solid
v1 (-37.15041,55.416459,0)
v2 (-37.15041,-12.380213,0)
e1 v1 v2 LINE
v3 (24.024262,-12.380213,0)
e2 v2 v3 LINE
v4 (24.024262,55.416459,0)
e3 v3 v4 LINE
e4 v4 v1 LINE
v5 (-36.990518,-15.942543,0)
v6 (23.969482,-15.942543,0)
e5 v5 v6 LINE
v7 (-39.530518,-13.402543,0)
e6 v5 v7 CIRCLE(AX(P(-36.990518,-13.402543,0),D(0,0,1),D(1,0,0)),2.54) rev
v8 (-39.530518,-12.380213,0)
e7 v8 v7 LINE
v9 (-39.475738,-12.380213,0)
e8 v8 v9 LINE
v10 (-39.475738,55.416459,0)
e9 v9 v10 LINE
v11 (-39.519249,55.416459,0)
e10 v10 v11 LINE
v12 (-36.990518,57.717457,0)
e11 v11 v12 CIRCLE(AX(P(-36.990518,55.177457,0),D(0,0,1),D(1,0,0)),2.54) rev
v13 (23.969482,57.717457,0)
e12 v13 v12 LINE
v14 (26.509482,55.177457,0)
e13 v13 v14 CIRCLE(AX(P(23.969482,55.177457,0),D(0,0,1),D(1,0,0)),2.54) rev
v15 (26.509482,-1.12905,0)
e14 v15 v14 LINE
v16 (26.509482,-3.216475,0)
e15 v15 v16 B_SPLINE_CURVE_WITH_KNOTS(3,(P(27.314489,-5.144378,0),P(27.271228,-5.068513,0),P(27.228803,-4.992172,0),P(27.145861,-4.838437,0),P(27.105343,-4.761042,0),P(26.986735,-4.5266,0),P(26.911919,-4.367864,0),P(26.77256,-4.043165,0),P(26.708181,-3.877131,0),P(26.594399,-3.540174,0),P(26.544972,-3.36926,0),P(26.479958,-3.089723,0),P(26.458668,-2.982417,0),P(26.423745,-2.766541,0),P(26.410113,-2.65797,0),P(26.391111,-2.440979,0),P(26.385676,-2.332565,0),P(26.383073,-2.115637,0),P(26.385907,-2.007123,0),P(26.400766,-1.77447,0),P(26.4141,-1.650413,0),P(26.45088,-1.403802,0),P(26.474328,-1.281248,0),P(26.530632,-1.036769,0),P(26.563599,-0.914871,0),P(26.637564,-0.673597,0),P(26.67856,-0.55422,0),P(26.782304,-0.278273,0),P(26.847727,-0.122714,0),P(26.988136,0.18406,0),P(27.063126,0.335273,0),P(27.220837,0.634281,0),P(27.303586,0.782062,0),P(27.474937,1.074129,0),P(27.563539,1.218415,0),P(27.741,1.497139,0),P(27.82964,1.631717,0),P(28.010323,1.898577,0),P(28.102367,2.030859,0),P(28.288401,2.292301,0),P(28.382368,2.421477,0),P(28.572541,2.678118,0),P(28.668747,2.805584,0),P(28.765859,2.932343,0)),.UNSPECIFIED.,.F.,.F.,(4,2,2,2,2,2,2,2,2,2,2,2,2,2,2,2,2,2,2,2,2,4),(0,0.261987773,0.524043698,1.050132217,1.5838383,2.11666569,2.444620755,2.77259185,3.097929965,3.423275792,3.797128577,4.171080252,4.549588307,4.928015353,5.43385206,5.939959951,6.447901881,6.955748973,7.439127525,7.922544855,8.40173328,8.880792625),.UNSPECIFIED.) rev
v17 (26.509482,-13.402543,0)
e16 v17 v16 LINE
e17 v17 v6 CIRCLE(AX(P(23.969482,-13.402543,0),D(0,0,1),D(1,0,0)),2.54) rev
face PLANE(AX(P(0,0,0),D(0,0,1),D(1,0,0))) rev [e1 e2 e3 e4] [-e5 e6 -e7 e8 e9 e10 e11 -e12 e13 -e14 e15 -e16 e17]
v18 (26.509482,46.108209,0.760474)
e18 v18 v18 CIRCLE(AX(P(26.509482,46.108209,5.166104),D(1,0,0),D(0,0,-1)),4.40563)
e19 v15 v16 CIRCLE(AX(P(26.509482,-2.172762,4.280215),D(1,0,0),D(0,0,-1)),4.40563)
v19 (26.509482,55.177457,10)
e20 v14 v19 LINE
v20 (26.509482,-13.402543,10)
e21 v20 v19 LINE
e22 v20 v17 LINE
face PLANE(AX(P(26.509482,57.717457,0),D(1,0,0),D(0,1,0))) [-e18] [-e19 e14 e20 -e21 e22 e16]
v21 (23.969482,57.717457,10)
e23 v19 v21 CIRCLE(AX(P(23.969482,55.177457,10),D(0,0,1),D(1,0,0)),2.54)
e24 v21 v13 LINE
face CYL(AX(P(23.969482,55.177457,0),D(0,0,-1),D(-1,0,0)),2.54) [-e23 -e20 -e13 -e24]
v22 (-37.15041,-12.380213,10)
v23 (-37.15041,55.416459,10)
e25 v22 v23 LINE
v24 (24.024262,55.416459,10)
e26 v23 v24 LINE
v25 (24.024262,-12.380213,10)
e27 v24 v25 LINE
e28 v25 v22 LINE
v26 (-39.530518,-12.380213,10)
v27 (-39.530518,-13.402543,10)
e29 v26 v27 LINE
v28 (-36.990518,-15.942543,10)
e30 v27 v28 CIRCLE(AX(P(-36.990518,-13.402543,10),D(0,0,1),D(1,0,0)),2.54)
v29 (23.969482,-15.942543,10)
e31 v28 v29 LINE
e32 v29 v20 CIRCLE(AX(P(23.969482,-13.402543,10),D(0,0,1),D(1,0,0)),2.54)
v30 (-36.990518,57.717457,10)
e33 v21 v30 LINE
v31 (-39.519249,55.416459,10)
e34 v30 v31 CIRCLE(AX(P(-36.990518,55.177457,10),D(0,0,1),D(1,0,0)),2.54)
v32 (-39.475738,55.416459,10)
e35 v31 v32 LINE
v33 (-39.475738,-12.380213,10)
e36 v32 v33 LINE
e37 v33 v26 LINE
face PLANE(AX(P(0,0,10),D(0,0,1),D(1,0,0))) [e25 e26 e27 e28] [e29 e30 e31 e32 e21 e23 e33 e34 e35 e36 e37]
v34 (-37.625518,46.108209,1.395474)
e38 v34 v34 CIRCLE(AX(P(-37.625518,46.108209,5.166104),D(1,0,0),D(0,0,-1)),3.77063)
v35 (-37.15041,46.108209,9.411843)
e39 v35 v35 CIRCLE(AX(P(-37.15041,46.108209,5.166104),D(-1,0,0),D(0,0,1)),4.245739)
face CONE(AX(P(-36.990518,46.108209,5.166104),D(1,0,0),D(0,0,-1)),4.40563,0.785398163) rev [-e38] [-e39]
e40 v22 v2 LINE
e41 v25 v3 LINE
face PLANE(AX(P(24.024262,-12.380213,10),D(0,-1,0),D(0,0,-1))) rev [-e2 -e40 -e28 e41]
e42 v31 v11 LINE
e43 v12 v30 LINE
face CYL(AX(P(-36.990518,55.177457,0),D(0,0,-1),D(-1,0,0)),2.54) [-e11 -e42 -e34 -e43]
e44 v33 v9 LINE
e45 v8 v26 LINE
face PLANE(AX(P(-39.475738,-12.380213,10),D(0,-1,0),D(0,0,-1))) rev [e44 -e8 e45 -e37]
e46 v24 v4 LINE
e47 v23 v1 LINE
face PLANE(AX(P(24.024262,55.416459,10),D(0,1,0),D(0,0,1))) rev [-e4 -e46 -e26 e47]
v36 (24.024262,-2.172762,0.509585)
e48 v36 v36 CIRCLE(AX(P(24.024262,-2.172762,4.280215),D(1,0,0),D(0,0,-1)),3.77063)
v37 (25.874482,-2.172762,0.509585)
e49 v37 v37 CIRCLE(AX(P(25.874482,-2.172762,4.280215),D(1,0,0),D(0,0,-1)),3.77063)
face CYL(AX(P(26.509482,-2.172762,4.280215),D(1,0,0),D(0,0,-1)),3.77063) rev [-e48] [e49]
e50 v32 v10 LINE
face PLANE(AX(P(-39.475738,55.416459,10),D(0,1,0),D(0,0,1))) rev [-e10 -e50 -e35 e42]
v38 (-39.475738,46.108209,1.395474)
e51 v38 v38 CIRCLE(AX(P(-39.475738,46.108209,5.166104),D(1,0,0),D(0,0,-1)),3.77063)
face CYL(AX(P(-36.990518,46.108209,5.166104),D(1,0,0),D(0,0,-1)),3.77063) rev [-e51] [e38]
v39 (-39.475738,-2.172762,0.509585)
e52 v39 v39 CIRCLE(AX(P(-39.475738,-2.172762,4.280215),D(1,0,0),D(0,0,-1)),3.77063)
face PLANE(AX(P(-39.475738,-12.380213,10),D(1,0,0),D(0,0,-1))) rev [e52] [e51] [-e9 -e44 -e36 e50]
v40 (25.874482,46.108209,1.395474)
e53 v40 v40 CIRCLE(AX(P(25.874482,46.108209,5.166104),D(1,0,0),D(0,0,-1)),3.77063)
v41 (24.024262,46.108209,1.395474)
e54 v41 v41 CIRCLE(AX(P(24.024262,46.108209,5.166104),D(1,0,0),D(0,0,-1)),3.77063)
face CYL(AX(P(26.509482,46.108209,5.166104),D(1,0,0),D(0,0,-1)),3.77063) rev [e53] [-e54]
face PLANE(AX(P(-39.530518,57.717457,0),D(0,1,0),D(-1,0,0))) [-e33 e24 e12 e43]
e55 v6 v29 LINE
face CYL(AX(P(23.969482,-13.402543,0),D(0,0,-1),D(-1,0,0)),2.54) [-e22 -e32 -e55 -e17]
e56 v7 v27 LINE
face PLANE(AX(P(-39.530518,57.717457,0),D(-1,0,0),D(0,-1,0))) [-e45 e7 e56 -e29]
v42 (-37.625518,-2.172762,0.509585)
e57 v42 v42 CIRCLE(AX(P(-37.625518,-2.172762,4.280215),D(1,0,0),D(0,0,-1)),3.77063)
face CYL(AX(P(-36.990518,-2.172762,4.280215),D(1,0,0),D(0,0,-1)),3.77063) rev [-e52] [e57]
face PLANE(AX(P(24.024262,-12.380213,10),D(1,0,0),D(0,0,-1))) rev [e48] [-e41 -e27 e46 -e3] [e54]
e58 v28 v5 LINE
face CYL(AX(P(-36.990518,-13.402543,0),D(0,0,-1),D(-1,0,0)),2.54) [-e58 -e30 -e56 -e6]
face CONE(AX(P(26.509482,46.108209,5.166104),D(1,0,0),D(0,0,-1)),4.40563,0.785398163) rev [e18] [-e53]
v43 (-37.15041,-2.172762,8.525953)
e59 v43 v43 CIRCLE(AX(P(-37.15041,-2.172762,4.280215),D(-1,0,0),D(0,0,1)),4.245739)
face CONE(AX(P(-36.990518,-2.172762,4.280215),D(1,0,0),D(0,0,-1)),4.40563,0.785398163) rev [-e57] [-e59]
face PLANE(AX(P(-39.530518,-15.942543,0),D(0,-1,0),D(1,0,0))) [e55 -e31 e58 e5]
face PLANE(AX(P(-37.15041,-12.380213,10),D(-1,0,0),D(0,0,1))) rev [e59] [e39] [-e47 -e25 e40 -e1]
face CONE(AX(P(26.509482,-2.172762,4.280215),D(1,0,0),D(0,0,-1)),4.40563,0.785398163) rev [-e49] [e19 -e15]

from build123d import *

# Parameters (mm, degrees)
SKETCH1_W                                  = 66.04
SKETCH1_H                                  = 73.66
BOSS_EXTRUDE1_DEPTH                        = 66.04
CONVERT_SOLID1_START                       = 10
CONVERT_SOLID1_OUTLINE_W                   = 66.04
CONVERT_SOLID1_OUTLINE_H                   = 73.66
CONVERT_SOLID1_DEPTH                       = 56.04
SKETCH12_W                                 = 61.174671733
SKETCH12_H                                 = 67.796672281
CUT_EXTRUDE1_DEPTH                         = 71.66800329
FILLET1_R                                  = 2.54
CBORE_FOR_8_FILLISTER_HEAD_MACHINE_2_COUNT = 2
CBORE_FOR_8_FILLISTER_HEAD_MACHINE_2_PITCH = 48.289098212
LPATTERN1_COUNT                            = 2
LPATTERN1_PITCH                            = 63.5


# Read off the part's stored shape, not the designer's step: Convert-Solid1
with BuildPart() as part:
    # Sketch1 → Boss-Extrude1 (new body)
    with BuildSketch(Plane.XY):
        with Locations((-6.510518448, 20.887456633)):
            Rectangle(SKETCH1_W, SKETCH1_H)
    extrude(amount=BOSS_EXTRUDE1_DEPTH)

    # Convert-Solid1 outline → Convert-Solid1 (cut)
    with BuildSketch(Plane.XY.offset(CONVERT_SOLID1_START)):
        with Locations((-6.510518448, 20.887456633)):
            Rectangle(CONVERT_SOLID1_OUTLINE_W, CONVERT_SOLID1_OUTLINE_H)
    extrude(amount=CONVERT_SOLID1_DEPTH, mode=Mode.SUBTRACT)

    # Sketch12 → Cut-Extrude1 (cut, symmetric)
    with BuildSketch(Plane(origin=(0, 0, 0), x_dir=(-1, 0, 0), z_dir=(0, 0, -1))):
        with Locations((6.563074008, 21.518123352)):
            Rectangle(SKETCH12_W, SKETCH12_H)
    cut_extrude1 = extrude(amount=CUT_EXTRUDE1_DEPTH, both=True, mode=Mode.SUBTRACT)

    # Fillet1
    fillet1_edges = [part.edges().sort_by_distance(p)[0] for p in [
        (-39.530518448, 57.717456633, 5),
        (-39.530518448, -15.942543367, 5),
        (26.509481552, -15.942543367, 5),
        (26.509481552, 57.717456633, 5),
    ]]
    fillet(fillet1_edges, radius=FILLET1_R)

    # Sketch18 → CBORE for #8 Fillister Head Machine Screw1 (revolve, cut)
    with BuildSketch(Plane(origin=(26.509481552, 46.108209089, 5.16610426), x_dir=(0, 0, -1), z_dir=(0, 1, 0))):
        Polygon((0, 0), (0, 26.750674586), (2.2479, 25.4), (2.2479, 3.9624), (3.77063, 3.9624), (3.77063, 0.635), (4.40563, 0), align=None)
    cbore_for_8_fillister_head_machine_scre = revolve(axis=Axis((32.859481552, 46.108209089, 5.16610426), (-1, 0, 0)), mode=Mode.SUBTRACT)

    # CBORE for _8 Fillister Head Machine  2: CBORE for #8 Fillister Head Machine Screw1 ×2
    with Locations(*[Vector(0, -0.9998317064949376, -0.018345535898989723) * (i * CBORE_FOR_8_FILLISTER_HEAD_MACHINE_2_PITCH) for i in range(1, CBORE_FOR_8_FILLISTER_HEAD_MACHINE_2_COUNT)]):
        add(cbore_for_8_fillister_head_machine_scre, mode=Mode.SUBTRACT)

    # LPattern1: Cut-Extrude1, CBORE for #8 Fillister Head Machine Screw1 ×2
    with Locations(*[(-i * LPATTERN1_PITCH, 0, 0) for i in range(1, LPATTERN1_COUNT)]):
        add(cut_extrude1, mode=Mode.SUBTRACT)
        add(cbore_for_8_fillister_head_machine_scre, mode=Mode.SUBTRACT)

    # LPattern1 copy 1 sketch → LPattern1 copy 1 (revolve, cut)
    with BuildSketch(Plane(origin=(-36.990518448, -2.172762381, 4.280214875), x_dir=(0, 0, -1), z_dir=(0, 1, 0))):
        Polygon((0, 0), (0, 26.750674586), (2.2479, 25.4), (2.2479, 3.9624), (3.77063, 3.9624), (3.77063, 0.635), (4.40563, 0), align=None)
    revolve(axis=Axis((-30.640518448, -2.172762381, 4.280214875), (-1, 0, 0)), mode=Mode.SUBTRACT)


solid = part.part
